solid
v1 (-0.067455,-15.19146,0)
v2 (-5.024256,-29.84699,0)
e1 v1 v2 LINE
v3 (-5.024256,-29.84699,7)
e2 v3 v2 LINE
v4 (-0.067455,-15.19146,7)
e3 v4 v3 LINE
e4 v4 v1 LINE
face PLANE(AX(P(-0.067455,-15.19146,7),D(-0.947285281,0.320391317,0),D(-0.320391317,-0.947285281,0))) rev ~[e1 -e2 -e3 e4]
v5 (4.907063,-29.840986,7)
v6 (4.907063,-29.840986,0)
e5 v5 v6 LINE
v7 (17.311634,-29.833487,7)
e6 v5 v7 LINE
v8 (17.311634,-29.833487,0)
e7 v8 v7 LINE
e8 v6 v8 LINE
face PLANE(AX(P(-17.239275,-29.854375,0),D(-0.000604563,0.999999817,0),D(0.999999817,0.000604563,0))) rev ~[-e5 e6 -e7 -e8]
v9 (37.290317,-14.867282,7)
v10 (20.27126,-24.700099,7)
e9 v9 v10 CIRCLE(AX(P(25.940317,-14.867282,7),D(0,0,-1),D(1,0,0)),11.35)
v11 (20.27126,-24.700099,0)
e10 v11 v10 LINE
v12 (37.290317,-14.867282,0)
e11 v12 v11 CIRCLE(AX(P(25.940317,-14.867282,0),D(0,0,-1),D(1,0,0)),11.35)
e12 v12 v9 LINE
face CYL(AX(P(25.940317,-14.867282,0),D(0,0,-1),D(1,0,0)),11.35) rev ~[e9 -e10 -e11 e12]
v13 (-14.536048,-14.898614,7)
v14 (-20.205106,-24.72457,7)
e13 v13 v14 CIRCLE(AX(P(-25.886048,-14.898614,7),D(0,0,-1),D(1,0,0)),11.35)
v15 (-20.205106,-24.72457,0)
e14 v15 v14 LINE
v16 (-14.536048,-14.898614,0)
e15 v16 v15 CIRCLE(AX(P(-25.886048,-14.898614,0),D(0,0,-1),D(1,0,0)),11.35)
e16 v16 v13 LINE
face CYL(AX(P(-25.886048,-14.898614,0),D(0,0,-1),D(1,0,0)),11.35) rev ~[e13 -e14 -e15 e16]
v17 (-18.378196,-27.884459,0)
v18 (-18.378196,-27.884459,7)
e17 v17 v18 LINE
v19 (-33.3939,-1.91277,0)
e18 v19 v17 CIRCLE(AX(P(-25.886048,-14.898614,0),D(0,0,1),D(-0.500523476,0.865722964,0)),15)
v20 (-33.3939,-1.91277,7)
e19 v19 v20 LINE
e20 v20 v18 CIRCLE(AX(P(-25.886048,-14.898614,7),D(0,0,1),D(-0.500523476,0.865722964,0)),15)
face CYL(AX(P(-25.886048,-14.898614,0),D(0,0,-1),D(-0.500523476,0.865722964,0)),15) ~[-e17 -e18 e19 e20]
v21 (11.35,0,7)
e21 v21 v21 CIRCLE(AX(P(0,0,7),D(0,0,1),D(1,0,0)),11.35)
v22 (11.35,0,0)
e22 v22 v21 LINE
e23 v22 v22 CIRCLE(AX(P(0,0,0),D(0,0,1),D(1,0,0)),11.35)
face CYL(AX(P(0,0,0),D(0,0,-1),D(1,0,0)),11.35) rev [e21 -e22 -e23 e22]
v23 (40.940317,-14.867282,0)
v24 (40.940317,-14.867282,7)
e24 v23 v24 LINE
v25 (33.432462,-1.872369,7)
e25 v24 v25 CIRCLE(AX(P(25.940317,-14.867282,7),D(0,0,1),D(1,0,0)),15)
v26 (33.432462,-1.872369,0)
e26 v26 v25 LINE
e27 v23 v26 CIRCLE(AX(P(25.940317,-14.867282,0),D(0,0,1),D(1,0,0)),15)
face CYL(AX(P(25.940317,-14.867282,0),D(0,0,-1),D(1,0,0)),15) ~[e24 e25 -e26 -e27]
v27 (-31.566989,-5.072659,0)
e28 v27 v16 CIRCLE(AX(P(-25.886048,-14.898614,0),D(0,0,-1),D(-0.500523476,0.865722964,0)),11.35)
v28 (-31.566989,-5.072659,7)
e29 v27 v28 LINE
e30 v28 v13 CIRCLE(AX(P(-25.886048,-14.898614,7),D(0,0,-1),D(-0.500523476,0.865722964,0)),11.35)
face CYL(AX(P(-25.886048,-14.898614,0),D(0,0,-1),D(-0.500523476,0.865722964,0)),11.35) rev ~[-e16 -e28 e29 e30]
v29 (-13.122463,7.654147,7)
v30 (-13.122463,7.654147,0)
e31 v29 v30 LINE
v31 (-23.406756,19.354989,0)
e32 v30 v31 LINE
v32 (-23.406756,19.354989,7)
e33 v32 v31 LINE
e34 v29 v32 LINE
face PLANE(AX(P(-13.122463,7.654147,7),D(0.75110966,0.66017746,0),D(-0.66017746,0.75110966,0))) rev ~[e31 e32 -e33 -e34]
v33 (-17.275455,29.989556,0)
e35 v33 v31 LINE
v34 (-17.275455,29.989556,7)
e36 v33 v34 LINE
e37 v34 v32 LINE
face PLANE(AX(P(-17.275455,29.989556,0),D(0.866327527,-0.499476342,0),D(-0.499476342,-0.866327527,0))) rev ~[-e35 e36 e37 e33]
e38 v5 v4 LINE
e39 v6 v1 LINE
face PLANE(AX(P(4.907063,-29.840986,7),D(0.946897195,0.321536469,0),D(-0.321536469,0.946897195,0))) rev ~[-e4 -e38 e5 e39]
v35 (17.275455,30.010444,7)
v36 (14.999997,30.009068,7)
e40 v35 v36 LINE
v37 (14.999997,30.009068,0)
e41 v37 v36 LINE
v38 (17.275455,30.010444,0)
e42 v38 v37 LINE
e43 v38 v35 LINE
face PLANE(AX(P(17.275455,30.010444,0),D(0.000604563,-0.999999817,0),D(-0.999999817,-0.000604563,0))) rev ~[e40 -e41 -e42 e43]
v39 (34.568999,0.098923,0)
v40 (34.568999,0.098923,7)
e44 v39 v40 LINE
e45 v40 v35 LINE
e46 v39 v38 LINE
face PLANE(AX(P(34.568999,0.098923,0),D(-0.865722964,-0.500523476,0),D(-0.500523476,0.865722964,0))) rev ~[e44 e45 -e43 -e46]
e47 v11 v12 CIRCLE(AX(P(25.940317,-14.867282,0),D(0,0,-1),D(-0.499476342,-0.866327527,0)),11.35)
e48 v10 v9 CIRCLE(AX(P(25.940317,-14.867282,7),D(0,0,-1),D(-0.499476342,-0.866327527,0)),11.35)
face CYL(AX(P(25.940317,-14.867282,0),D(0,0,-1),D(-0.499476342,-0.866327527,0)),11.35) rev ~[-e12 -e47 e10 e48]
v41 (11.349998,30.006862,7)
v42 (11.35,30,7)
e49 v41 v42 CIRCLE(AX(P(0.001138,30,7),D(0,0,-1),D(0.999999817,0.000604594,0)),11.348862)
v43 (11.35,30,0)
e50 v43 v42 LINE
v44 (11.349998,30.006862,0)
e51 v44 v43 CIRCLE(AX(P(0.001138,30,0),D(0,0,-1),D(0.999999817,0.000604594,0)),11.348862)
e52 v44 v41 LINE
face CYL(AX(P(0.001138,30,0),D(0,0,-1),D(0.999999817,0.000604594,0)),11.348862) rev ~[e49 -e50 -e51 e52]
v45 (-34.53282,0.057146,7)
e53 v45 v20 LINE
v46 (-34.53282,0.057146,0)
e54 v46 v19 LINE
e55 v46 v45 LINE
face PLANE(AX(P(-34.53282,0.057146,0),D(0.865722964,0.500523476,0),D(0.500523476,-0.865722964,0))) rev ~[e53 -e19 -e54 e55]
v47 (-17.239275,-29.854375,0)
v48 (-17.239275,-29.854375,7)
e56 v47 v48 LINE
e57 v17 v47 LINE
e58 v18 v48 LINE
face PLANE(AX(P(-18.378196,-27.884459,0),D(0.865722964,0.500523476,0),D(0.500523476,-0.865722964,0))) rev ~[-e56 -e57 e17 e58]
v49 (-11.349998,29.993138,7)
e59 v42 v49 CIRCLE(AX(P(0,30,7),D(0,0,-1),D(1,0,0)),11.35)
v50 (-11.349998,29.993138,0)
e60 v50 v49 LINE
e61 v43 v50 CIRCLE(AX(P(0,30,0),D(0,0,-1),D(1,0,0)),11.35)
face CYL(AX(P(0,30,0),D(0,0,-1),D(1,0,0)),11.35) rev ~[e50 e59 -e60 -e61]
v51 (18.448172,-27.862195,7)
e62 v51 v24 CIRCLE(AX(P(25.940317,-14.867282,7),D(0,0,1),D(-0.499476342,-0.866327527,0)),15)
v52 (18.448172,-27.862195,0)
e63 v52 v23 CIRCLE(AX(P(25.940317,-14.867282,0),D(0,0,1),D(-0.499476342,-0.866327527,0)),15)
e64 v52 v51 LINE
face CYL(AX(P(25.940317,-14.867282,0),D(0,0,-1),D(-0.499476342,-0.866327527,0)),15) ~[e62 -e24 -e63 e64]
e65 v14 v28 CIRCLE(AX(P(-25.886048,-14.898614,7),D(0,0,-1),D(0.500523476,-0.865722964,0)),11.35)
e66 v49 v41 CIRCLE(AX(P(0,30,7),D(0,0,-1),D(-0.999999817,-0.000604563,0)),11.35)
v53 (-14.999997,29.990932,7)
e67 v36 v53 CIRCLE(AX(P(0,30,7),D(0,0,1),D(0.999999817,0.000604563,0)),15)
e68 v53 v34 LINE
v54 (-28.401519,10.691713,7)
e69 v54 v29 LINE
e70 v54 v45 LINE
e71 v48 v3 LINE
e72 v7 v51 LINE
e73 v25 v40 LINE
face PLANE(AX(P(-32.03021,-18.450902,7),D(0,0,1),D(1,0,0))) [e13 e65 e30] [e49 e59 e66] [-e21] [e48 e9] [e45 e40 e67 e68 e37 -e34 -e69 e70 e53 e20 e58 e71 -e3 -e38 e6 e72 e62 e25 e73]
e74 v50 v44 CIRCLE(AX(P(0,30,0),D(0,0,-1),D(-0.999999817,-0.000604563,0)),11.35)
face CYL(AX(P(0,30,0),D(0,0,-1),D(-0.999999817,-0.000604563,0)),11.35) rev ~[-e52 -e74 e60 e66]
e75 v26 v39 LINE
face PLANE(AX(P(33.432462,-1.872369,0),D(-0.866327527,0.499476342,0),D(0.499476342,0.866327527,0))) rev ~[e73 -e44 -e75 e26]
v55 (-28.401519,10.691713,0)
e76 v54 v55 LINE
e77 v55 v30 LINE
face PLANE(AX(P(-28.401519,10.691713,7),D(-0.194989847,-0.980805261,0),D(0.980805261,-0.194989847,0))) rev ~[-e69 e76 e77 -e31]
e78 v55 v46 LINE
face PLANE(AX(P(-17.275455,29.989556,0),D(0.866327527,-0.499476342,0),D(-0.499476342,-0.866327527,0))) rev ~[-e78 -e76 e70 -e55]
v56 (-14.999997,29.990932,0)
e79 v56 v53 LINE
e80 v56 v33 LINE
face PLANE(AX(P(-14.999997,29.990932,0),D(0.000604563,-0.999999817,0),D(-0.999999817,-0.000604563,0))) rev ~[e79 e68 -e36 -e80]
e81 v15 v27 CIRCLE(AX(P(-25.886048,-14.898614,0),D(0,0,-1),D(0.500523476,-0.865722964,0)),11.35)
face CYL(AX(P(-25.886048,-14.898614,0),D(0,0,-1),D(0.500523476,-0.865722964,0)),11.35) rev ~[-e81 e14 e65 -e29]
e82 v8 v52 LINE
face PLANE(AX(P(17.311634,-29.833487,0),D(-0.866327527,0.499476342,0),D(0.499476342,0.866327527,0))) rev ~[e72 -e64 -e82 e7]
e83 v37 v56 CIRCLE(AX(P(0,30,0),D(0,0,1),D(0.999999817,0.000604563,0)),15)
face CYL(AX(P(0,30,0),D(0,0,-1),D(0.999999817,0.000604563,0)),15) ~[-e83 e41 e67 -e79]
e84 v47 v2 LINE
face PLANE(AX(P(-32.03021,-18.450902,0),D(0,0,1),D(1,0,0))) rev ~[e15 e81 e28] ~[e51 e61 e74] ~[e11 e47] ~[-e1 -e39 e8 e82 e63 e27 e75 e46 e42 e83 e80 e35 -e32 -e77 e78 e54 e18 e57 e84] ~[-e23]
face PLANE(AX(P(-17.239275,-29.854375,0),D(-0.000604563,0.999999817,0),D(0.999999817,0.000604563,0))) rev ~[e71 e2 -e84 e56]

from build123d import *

# Parameters (mm, degrees)
F0_R     = 11.35
F1_DEPTH = 7
F3_DEPTH = 50.7


# Not quite as in the source:
# - a feature names something its author has since deleted; it is built from what else it names


with BuildPart() as f1:
    # F0 (on Top) → F1 (new body)
    with BuildSketch(Plane.XY):
        with BuildLine():
            Line((-31.5669890957, -5.0726587053), (-33.3938997814, -1.9127698865))
            ThreePointArc((-33.3938997814, -1.9127698865), (-38.8718921093, -22.4064664798), (-18.378195516, -27.8844588077))
            Line((-18.378195516, -27.8844588077), (-20.2051062016, -24.7245699889))
            ThreePointArc((-20.2051062016, -24.7245699889), (-35.7120032905, -20.5795557942), (-31.5669890957, -5.0726587053))
        make_face()
        with BuildLine():
            ThreePointArc((-10.8860476487, -14.8986143471), (-18.3899747432, -1.9059667726), (-33.3938997814, -1.9127698865))
            Line((-33.3938997814, -1.9127698865), (-31.5669890957, -5.0726587053))
            ThreePointArc((-31.5669890957, -5.0726587053), (-20.2140191502, -5.0675110157), (-14.5360476487, -14.8986143471))
            ThreePointArc((-14.5360476487, -14.8986143471), (-16.0549443173, -20.5706428456), (-20.2051062016, -24.7245699889))
            Line((-20.2051062016, -24.7245699889), (-18.378195516, -27.8844588077))
            ThreePointArc((-18.378195516, -27.8844588077), (-12.8934000742, -22.3946872526), (-10.8860476487, -14.8986143471))
        make_face()
        with BuildLine():
            ThreePointArc((-11.3499979258, 29.9931382104), (-0.0068617896, 41.3499979258), (11.3499979258, 30.0068617896))
            Line((11.3499979258, 30.0068617896), (14.9999972588, 30.0090684445))
            ThreePointArc((14.9999972588, 30.0090684445), (-0.0090684445, 44.9999972588), (-14.9999972588, 29.9909315555))
            Line((-14.9999972588, 29.9909315555), (-11.3499979258, 29.9931382104))
        make_face()
        with BuildLine():
            ThreePointArc((11.3499979258, 30.0068617896), (11.3499994815, 30.003430895), (11.35, 30))
            ThreePointArc((11.35, 30), (0.003430895, 18.6500005185), (-11.3499979258, 29.9931382104))
            Line((-11.3499979258, 29.9931382104), (-14.9999972588, 29.9909315555))
            ThreePointArc((-14.9999972588, 29.9909315555), (0.0045342224, 15.0000006853), (15, 30))
            ThreePointArc((15, 30), (14.9999993147, 30.0045342224), (14.9999972588, 30.0090684445))
            Line((14.9999972588, 30.0090684445), (11.3499979258, 30.0068617896))
        make_face()
        with BuildLine():
            Line((31.6093732737, -5.0344646094), (33.4324619211, -1.8723691359))
            ThreePointArc((33.4324619211, -1.8723691359), (12.9454038899, -7.3751369148), (18.4481716689, -27.8621949459))
            Line((18.4481716689, -27.8621949459), (20.2712603162, -24.7000994724))
            ThreePointArc((20.2712603162, -24.7000994724), (16.1074993635, -9.1982255621), (31.6093732737, -5.0344646094))
        make_face()
        with BuildLine():
            ThreePointArc((40.940316795, -14.8672820409), (38.928430147, -7.3633556317), (33.4324619211, -1.8723691359))
            Line((33.4324619211, -1.8723691359), (31.6093732737, -5.0344646094))
            ThreePointArc((31.6093732737, -5.0344646094), (35.7679892314, -9.189311058), (37.290316795, -14.8672820409))
            ThreePointArc((37.290316795, -14.8672820409), (31.6182877779, -24.6949544773), (20.2712603162, -24.7000994724))
            Line((20.2712603162, -24.7000994724), (18.4481716689, -27.8621949459))
            ThreePointArc((18.4481716689, -27.8621949459), (33.4442432041, -27.855395393), (40.940316795, -14.8672820409))
        make_face()
        with BuildLine():
            Line((17.2754548146, 30.0104441021), (14.9999972588, 30.0090684445))
            ThreePointArc((14.9999972588, 30.0090684445), (14.9999993147, 30.0045342224), (15, 30))
            ThreePointArc((15, 30), (0.0045342224, 15.0000006853), (-14.9999972588, 29.9909315555))
            Line((-14.9999972588, 29.9909315555), (-17.2754548146, 29.9895558979))
            Line((-17.2754548146, 29.9895558979), (-34.5328199137, 0.0571463332))
            Line((-34.5328199137, 0.0571463332), (-33.3938997814, -1.9127698865))
            ThreePointArc((-33.3938997814, -1.9127698865), (-18.3899747432, -1.9059667726), (-10.8860476487, -14.8986143471))
            ThreePointArc((-10.8860476487, -14.8986143471), (-12.8934000742, -22.3946872526), (-18.378195516, -27.8844588077))
            Line((-18.378195516, -27.8844588077), (-17.2392753837, -29.8543750274))
            Line((-17.2392753837, -29.8543750274), (17.3116342454, -29.8334868233))
            Line((17.3116342454, -29.8334868233), (18.4481716689, -27.8621949459))
            ThreePointArc((18.4481716689, -27.8621949459), (12.9454038899, -7.3751369148), (33.4324619211, -1.8723691359))
            Line((33.4324619211, -1.8723691359), (34.5689993445, 0.0989227415))
            Line((34.5689993445, 0.0989227415), (17.2754548146, 30.0104441021))
        make_face()
        Circle(F0_R, mode=Mode.SUBTRACT)
    extrude(amount=F1_DEPTH)

    # F2 (on face) → F3 (cut)
    with BuildSketch(Plane.XY.offset(7)):
        Polygon((-13.1224627256, 7.654147332), (-23.4067556554, 19.3549887506), (-28.4015190728, 10.6917134805), align=None)
        Polygon((-0.067454671, -15.1914597466), (-5.0242557701, -29.8469902776), (4.9070631834, -29.8409861689), align=None)
    extrude(amount=-F3_DEPTH, mode=Mode.SUBTRACT)


solid = f1.part
